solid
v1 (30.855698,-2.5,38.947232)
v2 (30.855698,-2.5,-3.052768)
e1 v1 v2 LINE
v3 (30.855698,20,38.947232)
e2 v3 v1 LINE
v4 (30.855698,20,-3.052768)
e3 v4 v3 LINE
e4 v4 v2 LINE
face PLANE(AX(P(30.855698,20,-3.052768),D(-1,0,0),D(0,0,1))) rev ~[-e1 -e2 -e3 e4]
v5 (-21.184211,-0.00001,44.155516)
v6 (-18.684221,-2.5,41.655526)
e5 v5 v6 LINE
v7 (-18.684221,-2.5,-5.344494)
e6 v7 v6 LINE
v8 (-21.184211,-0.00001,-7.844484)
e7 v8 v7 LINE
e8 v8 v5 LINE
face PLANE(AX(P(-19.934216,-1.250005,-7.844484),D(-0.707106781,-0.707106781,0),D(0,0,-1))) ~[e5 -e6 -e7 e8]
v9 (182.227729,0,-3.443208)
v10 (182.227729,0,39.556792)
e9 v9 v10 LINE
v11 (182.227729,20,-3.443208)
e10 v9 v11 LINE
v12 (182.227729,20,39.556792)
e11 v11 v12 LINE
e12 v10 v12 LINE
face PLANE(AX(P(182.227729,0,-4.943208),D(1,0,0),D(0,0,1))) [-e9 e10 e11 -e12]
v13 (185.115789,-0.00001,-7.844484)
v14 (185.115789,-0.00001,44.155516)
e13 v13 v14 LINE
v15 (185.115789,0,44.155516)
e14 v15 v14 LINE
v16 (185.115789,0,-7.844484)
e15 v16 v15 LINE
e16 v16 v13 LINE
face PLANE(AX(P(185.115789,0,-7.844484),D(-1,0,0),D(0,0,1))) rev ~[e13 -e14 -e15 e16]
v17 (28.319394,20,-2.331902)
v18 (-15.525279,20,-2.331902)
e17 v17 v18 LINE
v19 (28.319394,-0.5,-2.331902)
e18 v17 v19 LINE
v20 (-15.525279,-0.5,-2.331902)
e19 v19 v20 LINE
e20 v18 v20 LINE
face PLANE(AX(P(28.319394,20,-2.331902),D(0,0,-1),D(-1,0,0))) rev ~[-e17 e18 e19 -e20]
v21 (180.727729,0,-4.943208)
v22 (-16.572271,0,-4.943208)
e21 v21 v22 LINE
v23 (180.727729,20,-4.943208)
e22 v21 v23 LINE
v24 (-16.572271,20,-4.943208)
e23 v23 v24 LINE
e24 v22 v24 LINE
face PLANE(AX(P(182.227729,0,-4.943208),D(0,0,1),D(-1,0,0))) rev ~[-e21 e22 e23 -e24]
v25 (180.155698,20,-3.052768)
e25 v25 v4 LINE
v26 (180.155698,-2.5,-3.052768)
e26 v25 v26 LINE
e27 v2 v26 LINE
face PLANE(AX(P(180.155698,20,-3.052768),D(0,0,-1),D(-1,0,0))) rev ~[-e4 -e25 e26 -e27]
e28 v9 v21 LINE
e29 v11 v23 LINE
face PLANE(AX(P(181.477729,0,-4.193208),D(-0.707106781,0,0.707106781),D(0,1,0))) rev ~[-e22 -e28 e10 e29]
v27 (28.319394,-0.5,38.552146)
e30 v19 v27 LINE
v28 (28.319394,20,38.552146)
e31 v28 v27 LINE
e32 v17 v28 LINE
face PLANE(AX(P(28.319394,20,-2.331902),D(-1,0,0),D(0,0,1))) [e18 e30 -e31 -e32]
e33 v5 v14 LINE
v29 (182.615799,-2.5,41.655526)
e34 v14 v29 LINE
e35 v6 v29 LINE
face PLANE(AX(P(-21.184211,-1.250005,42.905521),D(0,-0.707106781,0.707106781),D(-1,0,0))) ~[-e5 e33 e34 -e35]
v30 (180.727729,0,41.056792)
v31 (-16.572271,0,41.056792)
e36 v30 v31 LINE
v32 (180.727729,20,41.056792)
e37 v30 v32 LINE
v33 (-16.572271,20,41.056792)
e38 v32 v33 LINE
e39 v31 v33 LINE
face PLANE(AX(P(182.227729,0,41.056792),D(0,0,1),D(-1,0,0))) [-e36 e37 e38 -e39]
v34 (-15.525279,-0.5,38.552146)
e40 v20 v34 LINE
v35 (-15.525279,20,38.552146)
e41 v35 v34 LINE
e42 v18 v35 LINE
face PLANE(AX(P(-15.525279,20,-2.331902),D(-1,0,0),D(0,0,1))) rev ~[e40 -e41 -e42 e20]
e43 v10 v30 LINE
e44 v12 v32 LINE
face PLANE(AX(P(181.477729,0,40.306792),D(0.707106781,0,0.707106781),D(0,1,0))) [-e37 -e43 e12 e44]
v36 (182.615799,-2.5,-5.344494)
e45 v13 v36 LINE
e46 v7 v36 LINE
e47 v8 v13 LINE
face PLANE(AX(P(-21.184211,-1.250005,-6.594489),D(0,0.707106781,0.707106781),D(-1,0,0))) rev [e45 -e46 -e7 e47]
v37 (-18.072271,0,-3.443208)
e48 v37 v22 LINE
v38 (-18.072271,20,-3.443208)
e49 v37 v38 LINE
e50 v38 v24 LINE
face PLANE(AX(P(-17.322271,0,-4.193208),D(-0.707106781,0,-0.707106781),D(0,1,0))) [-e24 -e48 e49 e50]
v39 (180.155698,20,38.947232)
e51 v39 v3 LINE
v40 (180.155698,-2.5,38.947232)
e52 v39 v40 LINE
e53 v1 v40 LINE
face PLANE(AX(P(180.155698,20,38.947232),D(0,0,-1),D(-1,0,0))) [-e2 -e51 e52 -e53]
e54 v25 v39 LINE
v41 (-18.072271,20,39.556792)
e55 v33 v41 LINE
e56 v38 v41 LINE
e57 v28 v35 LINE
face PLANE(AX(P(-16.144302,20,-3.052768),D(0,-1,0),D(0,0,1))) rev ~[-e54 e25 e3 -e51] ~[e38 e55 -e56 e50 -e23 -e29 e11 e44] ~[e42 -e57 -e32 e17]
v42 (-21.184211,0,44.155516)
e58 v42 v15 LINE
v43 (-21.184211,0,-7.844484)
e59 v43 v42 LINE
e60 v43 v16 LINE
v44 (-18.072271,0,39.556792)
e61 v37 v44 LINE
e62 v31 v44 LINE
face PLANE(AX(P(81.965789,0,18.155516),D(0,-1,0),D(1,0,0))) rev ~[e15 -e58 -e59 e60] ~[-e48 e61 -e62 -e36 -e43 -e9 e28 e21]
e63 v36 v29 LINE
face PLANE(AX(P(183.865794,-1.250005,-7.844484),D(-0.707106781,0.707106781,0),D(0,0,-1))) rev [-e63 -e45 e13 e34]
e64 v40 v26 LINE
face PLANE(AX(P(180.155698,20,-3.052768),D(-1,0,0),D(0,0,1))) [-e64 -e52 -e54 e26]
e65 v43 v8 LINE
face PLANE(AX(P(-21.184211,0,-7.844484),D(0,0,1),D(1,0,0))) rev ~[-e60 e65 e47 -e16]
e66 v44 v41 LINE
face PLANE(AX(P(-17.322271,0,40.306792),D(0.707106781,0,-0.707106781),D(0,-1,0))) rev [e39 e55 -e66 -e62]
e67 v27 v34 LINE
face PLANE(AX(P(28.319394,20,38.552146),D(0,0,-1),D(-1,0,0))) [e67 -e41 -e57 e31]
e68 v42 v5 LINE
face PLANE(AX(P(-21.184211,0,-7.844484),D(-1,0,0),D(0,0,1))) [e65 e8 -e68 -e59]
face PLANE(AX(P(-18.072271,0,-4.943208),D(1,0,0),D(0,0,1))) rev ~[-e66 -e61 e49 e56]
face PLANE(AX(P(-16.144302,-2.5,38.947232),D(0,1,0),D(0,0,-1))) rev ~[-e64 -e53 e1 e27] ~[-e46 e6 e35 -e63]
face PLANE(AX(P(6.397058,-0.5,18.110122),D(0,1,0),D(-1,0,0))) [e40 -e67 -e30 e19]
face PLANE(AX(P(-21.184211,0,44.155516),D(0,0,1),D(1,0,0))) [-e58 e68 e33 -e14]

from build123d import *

# Parameters (mm, degrees)
F0_W      = 206.3
F0_H      = 52
F1_DEPTH  = 2.5
F2_SIZE   = 2.49999
F3_W      = 200.3
F3_H      = 46
F4_DEPTH  = 20
F5_W      = 196.3
F5_H      = 42
F6_DEPTH  = 25
F7_SIZE   = 1.5
F8_DEPTH  = 47
F9_W      = 43.8446728513
F9_H      = 40.8840479795
F10_DEPTH = 20.5


# Not quite as in the source:
# - a fillet or chamfer is up to 0.001 mm smaller than in the source, because OpenCascade refuses the exact size


with BuildPart() as f1:
    # F0 (on Front) → F1 (new body)
    with BuildSketch(Plane.XZ):
        with Locations((81.9657886937, 18.1555162981)):
            Rectangle(F0_W, F0_H)
    extrude(amount=F1_DEPTH)

    # F2 (size 2.5 in the source; OpenCascade refuses exactly that, so slightly less here)
    f2_edges = [f1.edges().sort_by_distance(p)[0] for p in [
        (81.965789, -2.5, 44.155516),
        (81.965789, -2.5, -7.844484),
        (185.115789, -2.5, 18.155516),
        (-21.184211, -2.5, 18.155516),
    ]]
    chamfer(f2_edges, length=F2_SIZE)

    # F3 (on face) → F4 (join)
    with BuildSketch(Plane(origin=(0, 0, 0), x_dir=(-1, 0, 0), z_dir=(0, 1, 0))):
        with Locations((-82.0777288884, 18.0567920078)):
            Rectangle(F3_W, F3_H)
    extrude(amount=F4_DEPTH)

    # F5 (on face) → F6 (cut)
    with BuildSketch(Plane(origin=(0, 20, 0), x_dir=(-1, 0, 0), z_dir=(0, 1, 0))):
        with Locations((-82.0056978608, 17.9472315861)):
            Rectangle(F5_W, F5_H)
    extrude(amount=-F6_DEPTH, mode=Mode.SUBTRACT)

    # F7
    f7_edges = [f1.edges().sort_by_distance(p)[0] for p in [
        (182.227729, 10, 41.056792),
        (182.227729, 10, -4.943208),
        (-18.072271, 10, 41.056792),
        (-18.072271, 10, -4.943208),
    ]]
    chamfer(f7_edges, length=F7_SIZE)

    # F8 (add): a face of the model
    f8_faces = [f1.faces().sort_by_distance(p)[0] for p in [
        (-16.1443021392, 8.75, 17.9472315861),
    ]]
    extrude(f8_faces, amount=F8_DEPTH)

    # F9 (on face) → F10 (cut)
    with BuildSketch(Plane(origin=(0, 20, 0), x_dir=(-1, 0, 0), z_dir=(0, 1, 0))):
        with Locations((-6.3970577903, 18.1101224152)):
            Rectangle(F9_W, F9_H)
    extrude(amount=-F10_DEPTH, mode=Mode.SUBTRACT)


solid = f1.part
